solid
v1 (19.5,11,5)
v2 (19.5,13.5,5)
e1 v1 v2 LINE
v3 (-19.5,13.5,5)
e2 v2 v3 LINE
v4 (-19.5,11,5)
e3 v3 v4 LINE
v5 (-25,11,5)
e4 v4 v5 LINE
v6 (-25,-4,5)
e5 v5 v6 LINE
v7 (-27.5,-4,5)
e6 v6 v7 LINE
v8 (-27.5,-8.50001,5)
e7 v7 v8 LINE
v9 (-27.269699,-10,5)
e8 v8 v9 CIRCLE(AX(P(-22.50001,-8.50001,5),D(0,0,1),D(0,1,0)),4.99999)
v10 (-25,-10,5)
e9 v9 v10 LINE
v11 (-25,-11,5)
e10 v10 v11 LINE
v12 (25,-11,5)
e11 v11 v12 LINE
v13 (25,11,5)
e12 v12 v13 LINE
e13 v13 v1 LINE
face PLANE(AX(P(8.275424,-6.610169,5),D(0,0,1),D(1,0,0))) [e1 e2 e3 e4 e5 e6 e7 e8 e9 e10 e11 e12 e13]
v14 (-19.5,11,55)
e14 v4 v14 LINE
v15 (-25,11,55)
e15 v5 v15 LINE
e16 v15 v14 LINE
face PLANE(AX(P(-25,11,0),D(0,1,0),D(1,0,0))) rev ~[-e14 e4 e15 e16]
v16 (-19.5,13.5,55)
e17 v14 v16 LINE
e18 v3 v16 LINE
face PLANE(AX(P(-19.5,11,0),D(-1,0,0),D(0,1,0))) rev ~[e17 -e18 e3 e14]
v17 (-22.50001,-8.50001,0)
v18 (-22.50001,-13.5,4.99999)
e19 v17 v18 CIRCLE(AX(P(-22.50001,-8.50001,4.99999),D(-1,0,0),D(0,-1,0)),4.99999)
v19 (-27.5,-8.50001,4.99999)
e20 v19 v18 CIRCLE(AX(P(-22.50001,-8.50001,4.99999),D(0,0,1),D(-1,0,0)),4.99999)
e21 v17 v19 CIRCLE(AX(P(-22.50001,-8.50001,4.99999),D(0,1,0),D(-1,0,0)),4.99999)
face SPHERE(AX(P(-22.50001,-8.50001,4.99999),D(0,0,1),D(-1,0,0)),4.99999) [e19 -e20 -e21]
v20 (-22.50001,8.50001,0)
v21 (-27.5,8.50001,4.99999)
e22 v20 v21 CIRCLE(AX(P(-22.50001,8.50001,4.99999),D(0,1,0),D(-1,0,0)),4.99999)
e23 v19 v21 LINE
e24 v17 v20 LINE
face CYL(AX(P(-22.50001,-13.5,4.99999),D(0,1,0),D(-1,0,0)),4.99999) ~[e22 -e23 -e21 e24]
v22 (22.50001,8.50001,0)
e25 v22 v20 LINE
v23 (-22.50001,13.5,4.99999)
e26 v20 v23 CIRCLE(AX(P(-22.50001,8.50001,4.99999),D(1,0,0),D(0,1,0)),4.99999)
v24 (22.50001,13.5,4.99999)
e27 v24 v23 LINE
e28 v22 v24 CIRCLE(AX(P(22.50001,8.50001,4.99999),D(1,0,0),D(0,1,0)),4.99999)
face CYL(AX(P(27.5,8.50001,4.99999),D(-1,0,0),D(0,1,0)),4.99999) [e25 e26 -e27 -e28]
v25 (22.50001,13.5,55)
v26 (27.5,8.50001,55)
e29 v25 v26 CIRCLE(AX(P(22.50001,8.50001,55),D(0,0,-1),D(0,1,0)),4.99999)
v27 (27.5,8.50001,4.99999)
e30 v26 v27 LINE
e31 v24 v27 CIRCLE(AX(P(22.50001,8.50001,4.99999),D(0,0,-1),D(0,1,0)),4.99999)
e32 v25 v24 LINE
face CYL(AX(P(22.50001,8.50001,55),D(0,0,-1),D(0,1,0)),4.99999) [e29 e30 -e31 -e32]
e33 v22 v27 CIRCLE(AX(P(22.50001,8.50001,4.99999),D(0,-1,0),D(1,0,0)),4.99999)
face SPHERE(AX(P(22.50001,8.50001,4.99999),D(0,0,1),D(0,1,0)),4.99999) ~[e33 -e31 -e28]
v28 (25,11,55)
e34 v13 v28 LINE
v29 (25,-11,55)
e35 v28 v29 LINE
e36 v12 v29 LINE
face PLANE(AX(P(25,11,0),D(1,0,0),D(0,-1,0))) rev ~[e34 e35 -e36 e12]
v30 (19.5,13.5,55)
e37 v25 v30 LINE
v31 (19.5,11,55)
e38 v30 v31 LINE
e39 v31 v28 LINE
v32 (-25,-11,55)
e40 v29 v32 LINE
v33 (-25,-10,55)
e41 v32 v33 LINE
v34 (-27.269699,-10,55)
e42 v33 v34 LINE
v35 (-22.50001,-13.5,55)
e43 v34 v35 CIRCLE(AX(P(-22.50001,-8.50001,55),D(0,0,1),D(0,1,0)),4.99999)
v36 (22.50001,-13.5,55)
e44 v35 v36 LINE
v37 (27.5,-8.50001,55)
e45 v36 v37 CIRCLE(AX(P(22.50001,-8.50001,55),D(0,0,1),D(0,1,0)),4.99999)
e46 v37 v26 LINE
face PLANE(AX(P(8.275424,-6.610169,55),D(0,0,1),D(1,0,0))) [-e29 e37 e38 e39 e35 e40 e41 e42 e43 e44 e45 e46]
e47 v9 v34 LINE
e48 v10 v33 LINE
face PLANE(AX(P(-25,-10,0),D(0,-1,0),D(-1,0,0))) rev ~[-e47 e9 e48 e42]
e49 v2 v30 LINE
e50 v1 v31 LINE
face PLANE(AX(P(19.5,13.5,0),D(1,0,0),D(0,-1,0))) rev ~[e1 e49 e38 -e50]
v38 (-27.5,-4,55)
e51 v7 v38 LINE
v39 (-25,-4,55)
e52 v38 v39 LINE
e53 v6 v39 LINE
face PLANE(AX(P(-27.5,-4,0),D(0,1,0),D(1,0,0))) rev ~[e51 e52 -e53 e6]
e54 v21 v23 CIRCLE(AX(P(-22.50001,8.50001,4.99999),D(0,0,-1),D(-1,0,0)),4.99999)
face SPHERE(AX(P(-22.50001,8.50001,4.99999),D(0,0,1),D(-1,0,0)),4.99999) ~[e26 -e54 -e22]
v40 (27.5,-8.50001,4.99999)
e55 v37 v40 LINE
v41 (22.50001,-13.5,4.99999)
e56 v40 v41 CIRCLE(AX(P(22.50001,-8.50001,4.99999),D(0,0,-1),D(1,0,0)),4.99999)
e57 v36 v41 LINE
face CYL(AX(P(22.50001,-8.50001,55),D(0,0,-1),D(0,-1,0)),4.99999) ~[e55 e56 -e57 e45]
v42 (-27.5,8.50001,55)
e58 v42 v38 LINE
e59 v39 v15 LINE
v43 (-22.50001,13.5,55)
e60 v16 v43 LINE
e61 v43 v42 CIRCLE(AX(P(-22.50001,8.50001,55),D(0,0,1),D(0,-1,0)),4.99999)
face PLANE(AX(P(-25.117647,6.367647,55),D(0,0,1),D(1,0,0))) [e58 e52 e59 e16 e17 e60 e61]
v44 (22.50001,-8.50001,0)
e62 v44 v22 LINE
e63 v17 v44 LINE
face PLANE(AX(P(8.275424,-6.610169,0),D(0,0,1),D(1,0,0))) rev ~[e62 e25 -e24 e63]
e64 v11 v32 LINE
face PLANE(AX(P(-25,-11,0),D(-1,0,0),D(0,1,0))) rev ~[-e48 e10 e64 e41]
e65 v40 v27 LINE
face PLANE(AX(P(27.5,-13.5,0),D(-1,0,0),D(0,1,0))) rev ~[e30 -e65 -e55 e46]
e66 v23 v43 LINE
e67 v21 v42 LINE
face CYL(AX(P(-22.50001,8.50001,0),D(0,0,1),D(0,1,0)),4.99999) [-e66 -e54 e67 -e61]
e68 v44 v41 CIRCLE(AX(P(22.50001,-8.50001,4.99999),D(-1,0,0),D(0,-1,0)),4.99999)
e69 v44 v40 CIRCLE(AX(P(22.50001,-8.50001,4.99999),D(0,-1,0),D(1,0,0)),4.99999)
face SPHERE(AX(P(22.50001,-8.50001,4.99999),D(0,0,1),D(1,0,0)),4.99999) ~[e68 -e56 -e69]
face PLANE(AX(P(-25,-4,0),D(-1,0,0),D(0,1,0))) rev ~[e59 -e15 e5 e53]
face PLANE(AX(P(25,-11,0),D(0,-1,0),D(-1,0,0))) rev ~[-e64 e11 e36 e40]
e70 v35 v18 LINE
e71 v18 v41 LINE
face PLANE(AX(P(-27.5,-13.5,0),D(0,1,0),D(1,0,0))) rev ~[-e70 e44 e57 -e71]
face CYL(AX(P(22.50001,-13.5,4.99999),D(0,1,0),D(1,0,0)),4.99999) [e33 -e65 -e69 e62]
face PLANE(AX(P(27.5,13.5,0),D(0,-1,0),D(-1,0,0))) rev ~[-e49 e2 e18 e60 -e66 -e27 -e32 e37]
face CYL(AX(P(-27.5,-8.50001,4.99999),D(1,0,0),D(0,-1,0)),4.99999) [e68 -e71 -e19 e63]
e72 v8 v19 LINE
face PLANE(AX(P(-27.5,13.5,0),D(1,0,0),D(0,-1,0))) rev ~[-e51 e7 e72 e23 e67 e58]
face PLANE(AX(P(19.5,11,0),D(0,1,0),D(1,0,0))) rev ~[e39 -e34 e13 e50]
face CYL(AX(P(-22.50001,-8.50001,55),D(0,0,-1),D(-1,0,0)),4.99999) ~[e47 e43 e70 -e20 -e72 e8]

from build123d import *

# Parameters (mm, degrees)
F0_W     = 39
F0_H     = 7.6218599584
F0_H_2   = 2.5
F0_W_2   = 6.4553316683
F0_H_3   = 6
F0_W_3   = 2.5
F1_DEPTH = 5
F2_DEPTH = 55
F3_R     = 4.99999


# Not quite as in the source:
# - a fillet or chamfer is up to 0.001 mm smaller than in the source, because OpenCascade refuses the exact size


with BuildPart() as f1:
    # F0 (on Top) → F1 (new body)
    with BuildSketch(Plane.XY):
        Polygon((27.5, 13.5), (19.5, 13.5), (19.5, 11), (25, 11), (25, -11), (-25, -11), (-25, -10), (-27.5, -10), (-27.5, -13.5), (27.5, -13.5), align=None)
        Polygon((-19.5, 13.5), (-27.5, 13.5), (-27.5, -4), (-25, -4), (-25, 11), (-19.5, 11), align=None)
        Polygon((-19.5, 3.3781400416), (-19.5, 11), (-25, 11), (-25, -4), (-18.5446683317, -4), (-18.5446683317, -10), (-25, -10), (-25, -11), (25, -11), (25, 11), (19.5, 11), (19.5, 3.3781400416), align=None)
        with Locations((0, 7.1890700208)):
            Rectangle(F0_W, F0_H)
        with Locations((0, 12.25)):
            Rectangle(F0_W, F0_H_2)
        with Locations((-21.7723341659, -7)):
            Rectangle(F0_W_2, F0_H_3)
        with Locations((-26.25, -7)):
            Rectangle(F0_W_3, F0_H_3)
    extrude(amount=F1_DEPTH)

    # F0 (on Top) → F2 (join)
    with BuildSketch(Plane.XY):
        Polygon((27.5, 13.5), (19.5, 13.5), (19.5, 11), (25, 11), (25, -11), (-25, -11), (-25, -10), (-27.5, -10), (-27.5, -13.5), (27.5, -13.5), align=None)
        Polygon((-19.5, 13.5), (-27.5, 13.5), (-27.5, -4), (-25, -4), (-25, 11), (-19.5, 11), align=None)
    extrude(amount=F2_DEPTH)

    # F3 (radius 5 in the source; OpenCascade refuses exactly that, so slightly less here)
    f3_edges = [f1.edges().sort_by_distance(p)[0] for p in [
        (27.5, 13.5, 27.5),
        (-27.5, 13.5, 27.5),
        (-27.5, -13.5, 27.5),
        (27.5, -13.5, 27.5),
        (-27.5, 0, 0),
        (0, 13.5, 0),
        (27.5, 0, 0),
        (0, -13.5, 0),
    ]]
    fillet(f3_edges, radius=F3_R)


solid = f1.part
